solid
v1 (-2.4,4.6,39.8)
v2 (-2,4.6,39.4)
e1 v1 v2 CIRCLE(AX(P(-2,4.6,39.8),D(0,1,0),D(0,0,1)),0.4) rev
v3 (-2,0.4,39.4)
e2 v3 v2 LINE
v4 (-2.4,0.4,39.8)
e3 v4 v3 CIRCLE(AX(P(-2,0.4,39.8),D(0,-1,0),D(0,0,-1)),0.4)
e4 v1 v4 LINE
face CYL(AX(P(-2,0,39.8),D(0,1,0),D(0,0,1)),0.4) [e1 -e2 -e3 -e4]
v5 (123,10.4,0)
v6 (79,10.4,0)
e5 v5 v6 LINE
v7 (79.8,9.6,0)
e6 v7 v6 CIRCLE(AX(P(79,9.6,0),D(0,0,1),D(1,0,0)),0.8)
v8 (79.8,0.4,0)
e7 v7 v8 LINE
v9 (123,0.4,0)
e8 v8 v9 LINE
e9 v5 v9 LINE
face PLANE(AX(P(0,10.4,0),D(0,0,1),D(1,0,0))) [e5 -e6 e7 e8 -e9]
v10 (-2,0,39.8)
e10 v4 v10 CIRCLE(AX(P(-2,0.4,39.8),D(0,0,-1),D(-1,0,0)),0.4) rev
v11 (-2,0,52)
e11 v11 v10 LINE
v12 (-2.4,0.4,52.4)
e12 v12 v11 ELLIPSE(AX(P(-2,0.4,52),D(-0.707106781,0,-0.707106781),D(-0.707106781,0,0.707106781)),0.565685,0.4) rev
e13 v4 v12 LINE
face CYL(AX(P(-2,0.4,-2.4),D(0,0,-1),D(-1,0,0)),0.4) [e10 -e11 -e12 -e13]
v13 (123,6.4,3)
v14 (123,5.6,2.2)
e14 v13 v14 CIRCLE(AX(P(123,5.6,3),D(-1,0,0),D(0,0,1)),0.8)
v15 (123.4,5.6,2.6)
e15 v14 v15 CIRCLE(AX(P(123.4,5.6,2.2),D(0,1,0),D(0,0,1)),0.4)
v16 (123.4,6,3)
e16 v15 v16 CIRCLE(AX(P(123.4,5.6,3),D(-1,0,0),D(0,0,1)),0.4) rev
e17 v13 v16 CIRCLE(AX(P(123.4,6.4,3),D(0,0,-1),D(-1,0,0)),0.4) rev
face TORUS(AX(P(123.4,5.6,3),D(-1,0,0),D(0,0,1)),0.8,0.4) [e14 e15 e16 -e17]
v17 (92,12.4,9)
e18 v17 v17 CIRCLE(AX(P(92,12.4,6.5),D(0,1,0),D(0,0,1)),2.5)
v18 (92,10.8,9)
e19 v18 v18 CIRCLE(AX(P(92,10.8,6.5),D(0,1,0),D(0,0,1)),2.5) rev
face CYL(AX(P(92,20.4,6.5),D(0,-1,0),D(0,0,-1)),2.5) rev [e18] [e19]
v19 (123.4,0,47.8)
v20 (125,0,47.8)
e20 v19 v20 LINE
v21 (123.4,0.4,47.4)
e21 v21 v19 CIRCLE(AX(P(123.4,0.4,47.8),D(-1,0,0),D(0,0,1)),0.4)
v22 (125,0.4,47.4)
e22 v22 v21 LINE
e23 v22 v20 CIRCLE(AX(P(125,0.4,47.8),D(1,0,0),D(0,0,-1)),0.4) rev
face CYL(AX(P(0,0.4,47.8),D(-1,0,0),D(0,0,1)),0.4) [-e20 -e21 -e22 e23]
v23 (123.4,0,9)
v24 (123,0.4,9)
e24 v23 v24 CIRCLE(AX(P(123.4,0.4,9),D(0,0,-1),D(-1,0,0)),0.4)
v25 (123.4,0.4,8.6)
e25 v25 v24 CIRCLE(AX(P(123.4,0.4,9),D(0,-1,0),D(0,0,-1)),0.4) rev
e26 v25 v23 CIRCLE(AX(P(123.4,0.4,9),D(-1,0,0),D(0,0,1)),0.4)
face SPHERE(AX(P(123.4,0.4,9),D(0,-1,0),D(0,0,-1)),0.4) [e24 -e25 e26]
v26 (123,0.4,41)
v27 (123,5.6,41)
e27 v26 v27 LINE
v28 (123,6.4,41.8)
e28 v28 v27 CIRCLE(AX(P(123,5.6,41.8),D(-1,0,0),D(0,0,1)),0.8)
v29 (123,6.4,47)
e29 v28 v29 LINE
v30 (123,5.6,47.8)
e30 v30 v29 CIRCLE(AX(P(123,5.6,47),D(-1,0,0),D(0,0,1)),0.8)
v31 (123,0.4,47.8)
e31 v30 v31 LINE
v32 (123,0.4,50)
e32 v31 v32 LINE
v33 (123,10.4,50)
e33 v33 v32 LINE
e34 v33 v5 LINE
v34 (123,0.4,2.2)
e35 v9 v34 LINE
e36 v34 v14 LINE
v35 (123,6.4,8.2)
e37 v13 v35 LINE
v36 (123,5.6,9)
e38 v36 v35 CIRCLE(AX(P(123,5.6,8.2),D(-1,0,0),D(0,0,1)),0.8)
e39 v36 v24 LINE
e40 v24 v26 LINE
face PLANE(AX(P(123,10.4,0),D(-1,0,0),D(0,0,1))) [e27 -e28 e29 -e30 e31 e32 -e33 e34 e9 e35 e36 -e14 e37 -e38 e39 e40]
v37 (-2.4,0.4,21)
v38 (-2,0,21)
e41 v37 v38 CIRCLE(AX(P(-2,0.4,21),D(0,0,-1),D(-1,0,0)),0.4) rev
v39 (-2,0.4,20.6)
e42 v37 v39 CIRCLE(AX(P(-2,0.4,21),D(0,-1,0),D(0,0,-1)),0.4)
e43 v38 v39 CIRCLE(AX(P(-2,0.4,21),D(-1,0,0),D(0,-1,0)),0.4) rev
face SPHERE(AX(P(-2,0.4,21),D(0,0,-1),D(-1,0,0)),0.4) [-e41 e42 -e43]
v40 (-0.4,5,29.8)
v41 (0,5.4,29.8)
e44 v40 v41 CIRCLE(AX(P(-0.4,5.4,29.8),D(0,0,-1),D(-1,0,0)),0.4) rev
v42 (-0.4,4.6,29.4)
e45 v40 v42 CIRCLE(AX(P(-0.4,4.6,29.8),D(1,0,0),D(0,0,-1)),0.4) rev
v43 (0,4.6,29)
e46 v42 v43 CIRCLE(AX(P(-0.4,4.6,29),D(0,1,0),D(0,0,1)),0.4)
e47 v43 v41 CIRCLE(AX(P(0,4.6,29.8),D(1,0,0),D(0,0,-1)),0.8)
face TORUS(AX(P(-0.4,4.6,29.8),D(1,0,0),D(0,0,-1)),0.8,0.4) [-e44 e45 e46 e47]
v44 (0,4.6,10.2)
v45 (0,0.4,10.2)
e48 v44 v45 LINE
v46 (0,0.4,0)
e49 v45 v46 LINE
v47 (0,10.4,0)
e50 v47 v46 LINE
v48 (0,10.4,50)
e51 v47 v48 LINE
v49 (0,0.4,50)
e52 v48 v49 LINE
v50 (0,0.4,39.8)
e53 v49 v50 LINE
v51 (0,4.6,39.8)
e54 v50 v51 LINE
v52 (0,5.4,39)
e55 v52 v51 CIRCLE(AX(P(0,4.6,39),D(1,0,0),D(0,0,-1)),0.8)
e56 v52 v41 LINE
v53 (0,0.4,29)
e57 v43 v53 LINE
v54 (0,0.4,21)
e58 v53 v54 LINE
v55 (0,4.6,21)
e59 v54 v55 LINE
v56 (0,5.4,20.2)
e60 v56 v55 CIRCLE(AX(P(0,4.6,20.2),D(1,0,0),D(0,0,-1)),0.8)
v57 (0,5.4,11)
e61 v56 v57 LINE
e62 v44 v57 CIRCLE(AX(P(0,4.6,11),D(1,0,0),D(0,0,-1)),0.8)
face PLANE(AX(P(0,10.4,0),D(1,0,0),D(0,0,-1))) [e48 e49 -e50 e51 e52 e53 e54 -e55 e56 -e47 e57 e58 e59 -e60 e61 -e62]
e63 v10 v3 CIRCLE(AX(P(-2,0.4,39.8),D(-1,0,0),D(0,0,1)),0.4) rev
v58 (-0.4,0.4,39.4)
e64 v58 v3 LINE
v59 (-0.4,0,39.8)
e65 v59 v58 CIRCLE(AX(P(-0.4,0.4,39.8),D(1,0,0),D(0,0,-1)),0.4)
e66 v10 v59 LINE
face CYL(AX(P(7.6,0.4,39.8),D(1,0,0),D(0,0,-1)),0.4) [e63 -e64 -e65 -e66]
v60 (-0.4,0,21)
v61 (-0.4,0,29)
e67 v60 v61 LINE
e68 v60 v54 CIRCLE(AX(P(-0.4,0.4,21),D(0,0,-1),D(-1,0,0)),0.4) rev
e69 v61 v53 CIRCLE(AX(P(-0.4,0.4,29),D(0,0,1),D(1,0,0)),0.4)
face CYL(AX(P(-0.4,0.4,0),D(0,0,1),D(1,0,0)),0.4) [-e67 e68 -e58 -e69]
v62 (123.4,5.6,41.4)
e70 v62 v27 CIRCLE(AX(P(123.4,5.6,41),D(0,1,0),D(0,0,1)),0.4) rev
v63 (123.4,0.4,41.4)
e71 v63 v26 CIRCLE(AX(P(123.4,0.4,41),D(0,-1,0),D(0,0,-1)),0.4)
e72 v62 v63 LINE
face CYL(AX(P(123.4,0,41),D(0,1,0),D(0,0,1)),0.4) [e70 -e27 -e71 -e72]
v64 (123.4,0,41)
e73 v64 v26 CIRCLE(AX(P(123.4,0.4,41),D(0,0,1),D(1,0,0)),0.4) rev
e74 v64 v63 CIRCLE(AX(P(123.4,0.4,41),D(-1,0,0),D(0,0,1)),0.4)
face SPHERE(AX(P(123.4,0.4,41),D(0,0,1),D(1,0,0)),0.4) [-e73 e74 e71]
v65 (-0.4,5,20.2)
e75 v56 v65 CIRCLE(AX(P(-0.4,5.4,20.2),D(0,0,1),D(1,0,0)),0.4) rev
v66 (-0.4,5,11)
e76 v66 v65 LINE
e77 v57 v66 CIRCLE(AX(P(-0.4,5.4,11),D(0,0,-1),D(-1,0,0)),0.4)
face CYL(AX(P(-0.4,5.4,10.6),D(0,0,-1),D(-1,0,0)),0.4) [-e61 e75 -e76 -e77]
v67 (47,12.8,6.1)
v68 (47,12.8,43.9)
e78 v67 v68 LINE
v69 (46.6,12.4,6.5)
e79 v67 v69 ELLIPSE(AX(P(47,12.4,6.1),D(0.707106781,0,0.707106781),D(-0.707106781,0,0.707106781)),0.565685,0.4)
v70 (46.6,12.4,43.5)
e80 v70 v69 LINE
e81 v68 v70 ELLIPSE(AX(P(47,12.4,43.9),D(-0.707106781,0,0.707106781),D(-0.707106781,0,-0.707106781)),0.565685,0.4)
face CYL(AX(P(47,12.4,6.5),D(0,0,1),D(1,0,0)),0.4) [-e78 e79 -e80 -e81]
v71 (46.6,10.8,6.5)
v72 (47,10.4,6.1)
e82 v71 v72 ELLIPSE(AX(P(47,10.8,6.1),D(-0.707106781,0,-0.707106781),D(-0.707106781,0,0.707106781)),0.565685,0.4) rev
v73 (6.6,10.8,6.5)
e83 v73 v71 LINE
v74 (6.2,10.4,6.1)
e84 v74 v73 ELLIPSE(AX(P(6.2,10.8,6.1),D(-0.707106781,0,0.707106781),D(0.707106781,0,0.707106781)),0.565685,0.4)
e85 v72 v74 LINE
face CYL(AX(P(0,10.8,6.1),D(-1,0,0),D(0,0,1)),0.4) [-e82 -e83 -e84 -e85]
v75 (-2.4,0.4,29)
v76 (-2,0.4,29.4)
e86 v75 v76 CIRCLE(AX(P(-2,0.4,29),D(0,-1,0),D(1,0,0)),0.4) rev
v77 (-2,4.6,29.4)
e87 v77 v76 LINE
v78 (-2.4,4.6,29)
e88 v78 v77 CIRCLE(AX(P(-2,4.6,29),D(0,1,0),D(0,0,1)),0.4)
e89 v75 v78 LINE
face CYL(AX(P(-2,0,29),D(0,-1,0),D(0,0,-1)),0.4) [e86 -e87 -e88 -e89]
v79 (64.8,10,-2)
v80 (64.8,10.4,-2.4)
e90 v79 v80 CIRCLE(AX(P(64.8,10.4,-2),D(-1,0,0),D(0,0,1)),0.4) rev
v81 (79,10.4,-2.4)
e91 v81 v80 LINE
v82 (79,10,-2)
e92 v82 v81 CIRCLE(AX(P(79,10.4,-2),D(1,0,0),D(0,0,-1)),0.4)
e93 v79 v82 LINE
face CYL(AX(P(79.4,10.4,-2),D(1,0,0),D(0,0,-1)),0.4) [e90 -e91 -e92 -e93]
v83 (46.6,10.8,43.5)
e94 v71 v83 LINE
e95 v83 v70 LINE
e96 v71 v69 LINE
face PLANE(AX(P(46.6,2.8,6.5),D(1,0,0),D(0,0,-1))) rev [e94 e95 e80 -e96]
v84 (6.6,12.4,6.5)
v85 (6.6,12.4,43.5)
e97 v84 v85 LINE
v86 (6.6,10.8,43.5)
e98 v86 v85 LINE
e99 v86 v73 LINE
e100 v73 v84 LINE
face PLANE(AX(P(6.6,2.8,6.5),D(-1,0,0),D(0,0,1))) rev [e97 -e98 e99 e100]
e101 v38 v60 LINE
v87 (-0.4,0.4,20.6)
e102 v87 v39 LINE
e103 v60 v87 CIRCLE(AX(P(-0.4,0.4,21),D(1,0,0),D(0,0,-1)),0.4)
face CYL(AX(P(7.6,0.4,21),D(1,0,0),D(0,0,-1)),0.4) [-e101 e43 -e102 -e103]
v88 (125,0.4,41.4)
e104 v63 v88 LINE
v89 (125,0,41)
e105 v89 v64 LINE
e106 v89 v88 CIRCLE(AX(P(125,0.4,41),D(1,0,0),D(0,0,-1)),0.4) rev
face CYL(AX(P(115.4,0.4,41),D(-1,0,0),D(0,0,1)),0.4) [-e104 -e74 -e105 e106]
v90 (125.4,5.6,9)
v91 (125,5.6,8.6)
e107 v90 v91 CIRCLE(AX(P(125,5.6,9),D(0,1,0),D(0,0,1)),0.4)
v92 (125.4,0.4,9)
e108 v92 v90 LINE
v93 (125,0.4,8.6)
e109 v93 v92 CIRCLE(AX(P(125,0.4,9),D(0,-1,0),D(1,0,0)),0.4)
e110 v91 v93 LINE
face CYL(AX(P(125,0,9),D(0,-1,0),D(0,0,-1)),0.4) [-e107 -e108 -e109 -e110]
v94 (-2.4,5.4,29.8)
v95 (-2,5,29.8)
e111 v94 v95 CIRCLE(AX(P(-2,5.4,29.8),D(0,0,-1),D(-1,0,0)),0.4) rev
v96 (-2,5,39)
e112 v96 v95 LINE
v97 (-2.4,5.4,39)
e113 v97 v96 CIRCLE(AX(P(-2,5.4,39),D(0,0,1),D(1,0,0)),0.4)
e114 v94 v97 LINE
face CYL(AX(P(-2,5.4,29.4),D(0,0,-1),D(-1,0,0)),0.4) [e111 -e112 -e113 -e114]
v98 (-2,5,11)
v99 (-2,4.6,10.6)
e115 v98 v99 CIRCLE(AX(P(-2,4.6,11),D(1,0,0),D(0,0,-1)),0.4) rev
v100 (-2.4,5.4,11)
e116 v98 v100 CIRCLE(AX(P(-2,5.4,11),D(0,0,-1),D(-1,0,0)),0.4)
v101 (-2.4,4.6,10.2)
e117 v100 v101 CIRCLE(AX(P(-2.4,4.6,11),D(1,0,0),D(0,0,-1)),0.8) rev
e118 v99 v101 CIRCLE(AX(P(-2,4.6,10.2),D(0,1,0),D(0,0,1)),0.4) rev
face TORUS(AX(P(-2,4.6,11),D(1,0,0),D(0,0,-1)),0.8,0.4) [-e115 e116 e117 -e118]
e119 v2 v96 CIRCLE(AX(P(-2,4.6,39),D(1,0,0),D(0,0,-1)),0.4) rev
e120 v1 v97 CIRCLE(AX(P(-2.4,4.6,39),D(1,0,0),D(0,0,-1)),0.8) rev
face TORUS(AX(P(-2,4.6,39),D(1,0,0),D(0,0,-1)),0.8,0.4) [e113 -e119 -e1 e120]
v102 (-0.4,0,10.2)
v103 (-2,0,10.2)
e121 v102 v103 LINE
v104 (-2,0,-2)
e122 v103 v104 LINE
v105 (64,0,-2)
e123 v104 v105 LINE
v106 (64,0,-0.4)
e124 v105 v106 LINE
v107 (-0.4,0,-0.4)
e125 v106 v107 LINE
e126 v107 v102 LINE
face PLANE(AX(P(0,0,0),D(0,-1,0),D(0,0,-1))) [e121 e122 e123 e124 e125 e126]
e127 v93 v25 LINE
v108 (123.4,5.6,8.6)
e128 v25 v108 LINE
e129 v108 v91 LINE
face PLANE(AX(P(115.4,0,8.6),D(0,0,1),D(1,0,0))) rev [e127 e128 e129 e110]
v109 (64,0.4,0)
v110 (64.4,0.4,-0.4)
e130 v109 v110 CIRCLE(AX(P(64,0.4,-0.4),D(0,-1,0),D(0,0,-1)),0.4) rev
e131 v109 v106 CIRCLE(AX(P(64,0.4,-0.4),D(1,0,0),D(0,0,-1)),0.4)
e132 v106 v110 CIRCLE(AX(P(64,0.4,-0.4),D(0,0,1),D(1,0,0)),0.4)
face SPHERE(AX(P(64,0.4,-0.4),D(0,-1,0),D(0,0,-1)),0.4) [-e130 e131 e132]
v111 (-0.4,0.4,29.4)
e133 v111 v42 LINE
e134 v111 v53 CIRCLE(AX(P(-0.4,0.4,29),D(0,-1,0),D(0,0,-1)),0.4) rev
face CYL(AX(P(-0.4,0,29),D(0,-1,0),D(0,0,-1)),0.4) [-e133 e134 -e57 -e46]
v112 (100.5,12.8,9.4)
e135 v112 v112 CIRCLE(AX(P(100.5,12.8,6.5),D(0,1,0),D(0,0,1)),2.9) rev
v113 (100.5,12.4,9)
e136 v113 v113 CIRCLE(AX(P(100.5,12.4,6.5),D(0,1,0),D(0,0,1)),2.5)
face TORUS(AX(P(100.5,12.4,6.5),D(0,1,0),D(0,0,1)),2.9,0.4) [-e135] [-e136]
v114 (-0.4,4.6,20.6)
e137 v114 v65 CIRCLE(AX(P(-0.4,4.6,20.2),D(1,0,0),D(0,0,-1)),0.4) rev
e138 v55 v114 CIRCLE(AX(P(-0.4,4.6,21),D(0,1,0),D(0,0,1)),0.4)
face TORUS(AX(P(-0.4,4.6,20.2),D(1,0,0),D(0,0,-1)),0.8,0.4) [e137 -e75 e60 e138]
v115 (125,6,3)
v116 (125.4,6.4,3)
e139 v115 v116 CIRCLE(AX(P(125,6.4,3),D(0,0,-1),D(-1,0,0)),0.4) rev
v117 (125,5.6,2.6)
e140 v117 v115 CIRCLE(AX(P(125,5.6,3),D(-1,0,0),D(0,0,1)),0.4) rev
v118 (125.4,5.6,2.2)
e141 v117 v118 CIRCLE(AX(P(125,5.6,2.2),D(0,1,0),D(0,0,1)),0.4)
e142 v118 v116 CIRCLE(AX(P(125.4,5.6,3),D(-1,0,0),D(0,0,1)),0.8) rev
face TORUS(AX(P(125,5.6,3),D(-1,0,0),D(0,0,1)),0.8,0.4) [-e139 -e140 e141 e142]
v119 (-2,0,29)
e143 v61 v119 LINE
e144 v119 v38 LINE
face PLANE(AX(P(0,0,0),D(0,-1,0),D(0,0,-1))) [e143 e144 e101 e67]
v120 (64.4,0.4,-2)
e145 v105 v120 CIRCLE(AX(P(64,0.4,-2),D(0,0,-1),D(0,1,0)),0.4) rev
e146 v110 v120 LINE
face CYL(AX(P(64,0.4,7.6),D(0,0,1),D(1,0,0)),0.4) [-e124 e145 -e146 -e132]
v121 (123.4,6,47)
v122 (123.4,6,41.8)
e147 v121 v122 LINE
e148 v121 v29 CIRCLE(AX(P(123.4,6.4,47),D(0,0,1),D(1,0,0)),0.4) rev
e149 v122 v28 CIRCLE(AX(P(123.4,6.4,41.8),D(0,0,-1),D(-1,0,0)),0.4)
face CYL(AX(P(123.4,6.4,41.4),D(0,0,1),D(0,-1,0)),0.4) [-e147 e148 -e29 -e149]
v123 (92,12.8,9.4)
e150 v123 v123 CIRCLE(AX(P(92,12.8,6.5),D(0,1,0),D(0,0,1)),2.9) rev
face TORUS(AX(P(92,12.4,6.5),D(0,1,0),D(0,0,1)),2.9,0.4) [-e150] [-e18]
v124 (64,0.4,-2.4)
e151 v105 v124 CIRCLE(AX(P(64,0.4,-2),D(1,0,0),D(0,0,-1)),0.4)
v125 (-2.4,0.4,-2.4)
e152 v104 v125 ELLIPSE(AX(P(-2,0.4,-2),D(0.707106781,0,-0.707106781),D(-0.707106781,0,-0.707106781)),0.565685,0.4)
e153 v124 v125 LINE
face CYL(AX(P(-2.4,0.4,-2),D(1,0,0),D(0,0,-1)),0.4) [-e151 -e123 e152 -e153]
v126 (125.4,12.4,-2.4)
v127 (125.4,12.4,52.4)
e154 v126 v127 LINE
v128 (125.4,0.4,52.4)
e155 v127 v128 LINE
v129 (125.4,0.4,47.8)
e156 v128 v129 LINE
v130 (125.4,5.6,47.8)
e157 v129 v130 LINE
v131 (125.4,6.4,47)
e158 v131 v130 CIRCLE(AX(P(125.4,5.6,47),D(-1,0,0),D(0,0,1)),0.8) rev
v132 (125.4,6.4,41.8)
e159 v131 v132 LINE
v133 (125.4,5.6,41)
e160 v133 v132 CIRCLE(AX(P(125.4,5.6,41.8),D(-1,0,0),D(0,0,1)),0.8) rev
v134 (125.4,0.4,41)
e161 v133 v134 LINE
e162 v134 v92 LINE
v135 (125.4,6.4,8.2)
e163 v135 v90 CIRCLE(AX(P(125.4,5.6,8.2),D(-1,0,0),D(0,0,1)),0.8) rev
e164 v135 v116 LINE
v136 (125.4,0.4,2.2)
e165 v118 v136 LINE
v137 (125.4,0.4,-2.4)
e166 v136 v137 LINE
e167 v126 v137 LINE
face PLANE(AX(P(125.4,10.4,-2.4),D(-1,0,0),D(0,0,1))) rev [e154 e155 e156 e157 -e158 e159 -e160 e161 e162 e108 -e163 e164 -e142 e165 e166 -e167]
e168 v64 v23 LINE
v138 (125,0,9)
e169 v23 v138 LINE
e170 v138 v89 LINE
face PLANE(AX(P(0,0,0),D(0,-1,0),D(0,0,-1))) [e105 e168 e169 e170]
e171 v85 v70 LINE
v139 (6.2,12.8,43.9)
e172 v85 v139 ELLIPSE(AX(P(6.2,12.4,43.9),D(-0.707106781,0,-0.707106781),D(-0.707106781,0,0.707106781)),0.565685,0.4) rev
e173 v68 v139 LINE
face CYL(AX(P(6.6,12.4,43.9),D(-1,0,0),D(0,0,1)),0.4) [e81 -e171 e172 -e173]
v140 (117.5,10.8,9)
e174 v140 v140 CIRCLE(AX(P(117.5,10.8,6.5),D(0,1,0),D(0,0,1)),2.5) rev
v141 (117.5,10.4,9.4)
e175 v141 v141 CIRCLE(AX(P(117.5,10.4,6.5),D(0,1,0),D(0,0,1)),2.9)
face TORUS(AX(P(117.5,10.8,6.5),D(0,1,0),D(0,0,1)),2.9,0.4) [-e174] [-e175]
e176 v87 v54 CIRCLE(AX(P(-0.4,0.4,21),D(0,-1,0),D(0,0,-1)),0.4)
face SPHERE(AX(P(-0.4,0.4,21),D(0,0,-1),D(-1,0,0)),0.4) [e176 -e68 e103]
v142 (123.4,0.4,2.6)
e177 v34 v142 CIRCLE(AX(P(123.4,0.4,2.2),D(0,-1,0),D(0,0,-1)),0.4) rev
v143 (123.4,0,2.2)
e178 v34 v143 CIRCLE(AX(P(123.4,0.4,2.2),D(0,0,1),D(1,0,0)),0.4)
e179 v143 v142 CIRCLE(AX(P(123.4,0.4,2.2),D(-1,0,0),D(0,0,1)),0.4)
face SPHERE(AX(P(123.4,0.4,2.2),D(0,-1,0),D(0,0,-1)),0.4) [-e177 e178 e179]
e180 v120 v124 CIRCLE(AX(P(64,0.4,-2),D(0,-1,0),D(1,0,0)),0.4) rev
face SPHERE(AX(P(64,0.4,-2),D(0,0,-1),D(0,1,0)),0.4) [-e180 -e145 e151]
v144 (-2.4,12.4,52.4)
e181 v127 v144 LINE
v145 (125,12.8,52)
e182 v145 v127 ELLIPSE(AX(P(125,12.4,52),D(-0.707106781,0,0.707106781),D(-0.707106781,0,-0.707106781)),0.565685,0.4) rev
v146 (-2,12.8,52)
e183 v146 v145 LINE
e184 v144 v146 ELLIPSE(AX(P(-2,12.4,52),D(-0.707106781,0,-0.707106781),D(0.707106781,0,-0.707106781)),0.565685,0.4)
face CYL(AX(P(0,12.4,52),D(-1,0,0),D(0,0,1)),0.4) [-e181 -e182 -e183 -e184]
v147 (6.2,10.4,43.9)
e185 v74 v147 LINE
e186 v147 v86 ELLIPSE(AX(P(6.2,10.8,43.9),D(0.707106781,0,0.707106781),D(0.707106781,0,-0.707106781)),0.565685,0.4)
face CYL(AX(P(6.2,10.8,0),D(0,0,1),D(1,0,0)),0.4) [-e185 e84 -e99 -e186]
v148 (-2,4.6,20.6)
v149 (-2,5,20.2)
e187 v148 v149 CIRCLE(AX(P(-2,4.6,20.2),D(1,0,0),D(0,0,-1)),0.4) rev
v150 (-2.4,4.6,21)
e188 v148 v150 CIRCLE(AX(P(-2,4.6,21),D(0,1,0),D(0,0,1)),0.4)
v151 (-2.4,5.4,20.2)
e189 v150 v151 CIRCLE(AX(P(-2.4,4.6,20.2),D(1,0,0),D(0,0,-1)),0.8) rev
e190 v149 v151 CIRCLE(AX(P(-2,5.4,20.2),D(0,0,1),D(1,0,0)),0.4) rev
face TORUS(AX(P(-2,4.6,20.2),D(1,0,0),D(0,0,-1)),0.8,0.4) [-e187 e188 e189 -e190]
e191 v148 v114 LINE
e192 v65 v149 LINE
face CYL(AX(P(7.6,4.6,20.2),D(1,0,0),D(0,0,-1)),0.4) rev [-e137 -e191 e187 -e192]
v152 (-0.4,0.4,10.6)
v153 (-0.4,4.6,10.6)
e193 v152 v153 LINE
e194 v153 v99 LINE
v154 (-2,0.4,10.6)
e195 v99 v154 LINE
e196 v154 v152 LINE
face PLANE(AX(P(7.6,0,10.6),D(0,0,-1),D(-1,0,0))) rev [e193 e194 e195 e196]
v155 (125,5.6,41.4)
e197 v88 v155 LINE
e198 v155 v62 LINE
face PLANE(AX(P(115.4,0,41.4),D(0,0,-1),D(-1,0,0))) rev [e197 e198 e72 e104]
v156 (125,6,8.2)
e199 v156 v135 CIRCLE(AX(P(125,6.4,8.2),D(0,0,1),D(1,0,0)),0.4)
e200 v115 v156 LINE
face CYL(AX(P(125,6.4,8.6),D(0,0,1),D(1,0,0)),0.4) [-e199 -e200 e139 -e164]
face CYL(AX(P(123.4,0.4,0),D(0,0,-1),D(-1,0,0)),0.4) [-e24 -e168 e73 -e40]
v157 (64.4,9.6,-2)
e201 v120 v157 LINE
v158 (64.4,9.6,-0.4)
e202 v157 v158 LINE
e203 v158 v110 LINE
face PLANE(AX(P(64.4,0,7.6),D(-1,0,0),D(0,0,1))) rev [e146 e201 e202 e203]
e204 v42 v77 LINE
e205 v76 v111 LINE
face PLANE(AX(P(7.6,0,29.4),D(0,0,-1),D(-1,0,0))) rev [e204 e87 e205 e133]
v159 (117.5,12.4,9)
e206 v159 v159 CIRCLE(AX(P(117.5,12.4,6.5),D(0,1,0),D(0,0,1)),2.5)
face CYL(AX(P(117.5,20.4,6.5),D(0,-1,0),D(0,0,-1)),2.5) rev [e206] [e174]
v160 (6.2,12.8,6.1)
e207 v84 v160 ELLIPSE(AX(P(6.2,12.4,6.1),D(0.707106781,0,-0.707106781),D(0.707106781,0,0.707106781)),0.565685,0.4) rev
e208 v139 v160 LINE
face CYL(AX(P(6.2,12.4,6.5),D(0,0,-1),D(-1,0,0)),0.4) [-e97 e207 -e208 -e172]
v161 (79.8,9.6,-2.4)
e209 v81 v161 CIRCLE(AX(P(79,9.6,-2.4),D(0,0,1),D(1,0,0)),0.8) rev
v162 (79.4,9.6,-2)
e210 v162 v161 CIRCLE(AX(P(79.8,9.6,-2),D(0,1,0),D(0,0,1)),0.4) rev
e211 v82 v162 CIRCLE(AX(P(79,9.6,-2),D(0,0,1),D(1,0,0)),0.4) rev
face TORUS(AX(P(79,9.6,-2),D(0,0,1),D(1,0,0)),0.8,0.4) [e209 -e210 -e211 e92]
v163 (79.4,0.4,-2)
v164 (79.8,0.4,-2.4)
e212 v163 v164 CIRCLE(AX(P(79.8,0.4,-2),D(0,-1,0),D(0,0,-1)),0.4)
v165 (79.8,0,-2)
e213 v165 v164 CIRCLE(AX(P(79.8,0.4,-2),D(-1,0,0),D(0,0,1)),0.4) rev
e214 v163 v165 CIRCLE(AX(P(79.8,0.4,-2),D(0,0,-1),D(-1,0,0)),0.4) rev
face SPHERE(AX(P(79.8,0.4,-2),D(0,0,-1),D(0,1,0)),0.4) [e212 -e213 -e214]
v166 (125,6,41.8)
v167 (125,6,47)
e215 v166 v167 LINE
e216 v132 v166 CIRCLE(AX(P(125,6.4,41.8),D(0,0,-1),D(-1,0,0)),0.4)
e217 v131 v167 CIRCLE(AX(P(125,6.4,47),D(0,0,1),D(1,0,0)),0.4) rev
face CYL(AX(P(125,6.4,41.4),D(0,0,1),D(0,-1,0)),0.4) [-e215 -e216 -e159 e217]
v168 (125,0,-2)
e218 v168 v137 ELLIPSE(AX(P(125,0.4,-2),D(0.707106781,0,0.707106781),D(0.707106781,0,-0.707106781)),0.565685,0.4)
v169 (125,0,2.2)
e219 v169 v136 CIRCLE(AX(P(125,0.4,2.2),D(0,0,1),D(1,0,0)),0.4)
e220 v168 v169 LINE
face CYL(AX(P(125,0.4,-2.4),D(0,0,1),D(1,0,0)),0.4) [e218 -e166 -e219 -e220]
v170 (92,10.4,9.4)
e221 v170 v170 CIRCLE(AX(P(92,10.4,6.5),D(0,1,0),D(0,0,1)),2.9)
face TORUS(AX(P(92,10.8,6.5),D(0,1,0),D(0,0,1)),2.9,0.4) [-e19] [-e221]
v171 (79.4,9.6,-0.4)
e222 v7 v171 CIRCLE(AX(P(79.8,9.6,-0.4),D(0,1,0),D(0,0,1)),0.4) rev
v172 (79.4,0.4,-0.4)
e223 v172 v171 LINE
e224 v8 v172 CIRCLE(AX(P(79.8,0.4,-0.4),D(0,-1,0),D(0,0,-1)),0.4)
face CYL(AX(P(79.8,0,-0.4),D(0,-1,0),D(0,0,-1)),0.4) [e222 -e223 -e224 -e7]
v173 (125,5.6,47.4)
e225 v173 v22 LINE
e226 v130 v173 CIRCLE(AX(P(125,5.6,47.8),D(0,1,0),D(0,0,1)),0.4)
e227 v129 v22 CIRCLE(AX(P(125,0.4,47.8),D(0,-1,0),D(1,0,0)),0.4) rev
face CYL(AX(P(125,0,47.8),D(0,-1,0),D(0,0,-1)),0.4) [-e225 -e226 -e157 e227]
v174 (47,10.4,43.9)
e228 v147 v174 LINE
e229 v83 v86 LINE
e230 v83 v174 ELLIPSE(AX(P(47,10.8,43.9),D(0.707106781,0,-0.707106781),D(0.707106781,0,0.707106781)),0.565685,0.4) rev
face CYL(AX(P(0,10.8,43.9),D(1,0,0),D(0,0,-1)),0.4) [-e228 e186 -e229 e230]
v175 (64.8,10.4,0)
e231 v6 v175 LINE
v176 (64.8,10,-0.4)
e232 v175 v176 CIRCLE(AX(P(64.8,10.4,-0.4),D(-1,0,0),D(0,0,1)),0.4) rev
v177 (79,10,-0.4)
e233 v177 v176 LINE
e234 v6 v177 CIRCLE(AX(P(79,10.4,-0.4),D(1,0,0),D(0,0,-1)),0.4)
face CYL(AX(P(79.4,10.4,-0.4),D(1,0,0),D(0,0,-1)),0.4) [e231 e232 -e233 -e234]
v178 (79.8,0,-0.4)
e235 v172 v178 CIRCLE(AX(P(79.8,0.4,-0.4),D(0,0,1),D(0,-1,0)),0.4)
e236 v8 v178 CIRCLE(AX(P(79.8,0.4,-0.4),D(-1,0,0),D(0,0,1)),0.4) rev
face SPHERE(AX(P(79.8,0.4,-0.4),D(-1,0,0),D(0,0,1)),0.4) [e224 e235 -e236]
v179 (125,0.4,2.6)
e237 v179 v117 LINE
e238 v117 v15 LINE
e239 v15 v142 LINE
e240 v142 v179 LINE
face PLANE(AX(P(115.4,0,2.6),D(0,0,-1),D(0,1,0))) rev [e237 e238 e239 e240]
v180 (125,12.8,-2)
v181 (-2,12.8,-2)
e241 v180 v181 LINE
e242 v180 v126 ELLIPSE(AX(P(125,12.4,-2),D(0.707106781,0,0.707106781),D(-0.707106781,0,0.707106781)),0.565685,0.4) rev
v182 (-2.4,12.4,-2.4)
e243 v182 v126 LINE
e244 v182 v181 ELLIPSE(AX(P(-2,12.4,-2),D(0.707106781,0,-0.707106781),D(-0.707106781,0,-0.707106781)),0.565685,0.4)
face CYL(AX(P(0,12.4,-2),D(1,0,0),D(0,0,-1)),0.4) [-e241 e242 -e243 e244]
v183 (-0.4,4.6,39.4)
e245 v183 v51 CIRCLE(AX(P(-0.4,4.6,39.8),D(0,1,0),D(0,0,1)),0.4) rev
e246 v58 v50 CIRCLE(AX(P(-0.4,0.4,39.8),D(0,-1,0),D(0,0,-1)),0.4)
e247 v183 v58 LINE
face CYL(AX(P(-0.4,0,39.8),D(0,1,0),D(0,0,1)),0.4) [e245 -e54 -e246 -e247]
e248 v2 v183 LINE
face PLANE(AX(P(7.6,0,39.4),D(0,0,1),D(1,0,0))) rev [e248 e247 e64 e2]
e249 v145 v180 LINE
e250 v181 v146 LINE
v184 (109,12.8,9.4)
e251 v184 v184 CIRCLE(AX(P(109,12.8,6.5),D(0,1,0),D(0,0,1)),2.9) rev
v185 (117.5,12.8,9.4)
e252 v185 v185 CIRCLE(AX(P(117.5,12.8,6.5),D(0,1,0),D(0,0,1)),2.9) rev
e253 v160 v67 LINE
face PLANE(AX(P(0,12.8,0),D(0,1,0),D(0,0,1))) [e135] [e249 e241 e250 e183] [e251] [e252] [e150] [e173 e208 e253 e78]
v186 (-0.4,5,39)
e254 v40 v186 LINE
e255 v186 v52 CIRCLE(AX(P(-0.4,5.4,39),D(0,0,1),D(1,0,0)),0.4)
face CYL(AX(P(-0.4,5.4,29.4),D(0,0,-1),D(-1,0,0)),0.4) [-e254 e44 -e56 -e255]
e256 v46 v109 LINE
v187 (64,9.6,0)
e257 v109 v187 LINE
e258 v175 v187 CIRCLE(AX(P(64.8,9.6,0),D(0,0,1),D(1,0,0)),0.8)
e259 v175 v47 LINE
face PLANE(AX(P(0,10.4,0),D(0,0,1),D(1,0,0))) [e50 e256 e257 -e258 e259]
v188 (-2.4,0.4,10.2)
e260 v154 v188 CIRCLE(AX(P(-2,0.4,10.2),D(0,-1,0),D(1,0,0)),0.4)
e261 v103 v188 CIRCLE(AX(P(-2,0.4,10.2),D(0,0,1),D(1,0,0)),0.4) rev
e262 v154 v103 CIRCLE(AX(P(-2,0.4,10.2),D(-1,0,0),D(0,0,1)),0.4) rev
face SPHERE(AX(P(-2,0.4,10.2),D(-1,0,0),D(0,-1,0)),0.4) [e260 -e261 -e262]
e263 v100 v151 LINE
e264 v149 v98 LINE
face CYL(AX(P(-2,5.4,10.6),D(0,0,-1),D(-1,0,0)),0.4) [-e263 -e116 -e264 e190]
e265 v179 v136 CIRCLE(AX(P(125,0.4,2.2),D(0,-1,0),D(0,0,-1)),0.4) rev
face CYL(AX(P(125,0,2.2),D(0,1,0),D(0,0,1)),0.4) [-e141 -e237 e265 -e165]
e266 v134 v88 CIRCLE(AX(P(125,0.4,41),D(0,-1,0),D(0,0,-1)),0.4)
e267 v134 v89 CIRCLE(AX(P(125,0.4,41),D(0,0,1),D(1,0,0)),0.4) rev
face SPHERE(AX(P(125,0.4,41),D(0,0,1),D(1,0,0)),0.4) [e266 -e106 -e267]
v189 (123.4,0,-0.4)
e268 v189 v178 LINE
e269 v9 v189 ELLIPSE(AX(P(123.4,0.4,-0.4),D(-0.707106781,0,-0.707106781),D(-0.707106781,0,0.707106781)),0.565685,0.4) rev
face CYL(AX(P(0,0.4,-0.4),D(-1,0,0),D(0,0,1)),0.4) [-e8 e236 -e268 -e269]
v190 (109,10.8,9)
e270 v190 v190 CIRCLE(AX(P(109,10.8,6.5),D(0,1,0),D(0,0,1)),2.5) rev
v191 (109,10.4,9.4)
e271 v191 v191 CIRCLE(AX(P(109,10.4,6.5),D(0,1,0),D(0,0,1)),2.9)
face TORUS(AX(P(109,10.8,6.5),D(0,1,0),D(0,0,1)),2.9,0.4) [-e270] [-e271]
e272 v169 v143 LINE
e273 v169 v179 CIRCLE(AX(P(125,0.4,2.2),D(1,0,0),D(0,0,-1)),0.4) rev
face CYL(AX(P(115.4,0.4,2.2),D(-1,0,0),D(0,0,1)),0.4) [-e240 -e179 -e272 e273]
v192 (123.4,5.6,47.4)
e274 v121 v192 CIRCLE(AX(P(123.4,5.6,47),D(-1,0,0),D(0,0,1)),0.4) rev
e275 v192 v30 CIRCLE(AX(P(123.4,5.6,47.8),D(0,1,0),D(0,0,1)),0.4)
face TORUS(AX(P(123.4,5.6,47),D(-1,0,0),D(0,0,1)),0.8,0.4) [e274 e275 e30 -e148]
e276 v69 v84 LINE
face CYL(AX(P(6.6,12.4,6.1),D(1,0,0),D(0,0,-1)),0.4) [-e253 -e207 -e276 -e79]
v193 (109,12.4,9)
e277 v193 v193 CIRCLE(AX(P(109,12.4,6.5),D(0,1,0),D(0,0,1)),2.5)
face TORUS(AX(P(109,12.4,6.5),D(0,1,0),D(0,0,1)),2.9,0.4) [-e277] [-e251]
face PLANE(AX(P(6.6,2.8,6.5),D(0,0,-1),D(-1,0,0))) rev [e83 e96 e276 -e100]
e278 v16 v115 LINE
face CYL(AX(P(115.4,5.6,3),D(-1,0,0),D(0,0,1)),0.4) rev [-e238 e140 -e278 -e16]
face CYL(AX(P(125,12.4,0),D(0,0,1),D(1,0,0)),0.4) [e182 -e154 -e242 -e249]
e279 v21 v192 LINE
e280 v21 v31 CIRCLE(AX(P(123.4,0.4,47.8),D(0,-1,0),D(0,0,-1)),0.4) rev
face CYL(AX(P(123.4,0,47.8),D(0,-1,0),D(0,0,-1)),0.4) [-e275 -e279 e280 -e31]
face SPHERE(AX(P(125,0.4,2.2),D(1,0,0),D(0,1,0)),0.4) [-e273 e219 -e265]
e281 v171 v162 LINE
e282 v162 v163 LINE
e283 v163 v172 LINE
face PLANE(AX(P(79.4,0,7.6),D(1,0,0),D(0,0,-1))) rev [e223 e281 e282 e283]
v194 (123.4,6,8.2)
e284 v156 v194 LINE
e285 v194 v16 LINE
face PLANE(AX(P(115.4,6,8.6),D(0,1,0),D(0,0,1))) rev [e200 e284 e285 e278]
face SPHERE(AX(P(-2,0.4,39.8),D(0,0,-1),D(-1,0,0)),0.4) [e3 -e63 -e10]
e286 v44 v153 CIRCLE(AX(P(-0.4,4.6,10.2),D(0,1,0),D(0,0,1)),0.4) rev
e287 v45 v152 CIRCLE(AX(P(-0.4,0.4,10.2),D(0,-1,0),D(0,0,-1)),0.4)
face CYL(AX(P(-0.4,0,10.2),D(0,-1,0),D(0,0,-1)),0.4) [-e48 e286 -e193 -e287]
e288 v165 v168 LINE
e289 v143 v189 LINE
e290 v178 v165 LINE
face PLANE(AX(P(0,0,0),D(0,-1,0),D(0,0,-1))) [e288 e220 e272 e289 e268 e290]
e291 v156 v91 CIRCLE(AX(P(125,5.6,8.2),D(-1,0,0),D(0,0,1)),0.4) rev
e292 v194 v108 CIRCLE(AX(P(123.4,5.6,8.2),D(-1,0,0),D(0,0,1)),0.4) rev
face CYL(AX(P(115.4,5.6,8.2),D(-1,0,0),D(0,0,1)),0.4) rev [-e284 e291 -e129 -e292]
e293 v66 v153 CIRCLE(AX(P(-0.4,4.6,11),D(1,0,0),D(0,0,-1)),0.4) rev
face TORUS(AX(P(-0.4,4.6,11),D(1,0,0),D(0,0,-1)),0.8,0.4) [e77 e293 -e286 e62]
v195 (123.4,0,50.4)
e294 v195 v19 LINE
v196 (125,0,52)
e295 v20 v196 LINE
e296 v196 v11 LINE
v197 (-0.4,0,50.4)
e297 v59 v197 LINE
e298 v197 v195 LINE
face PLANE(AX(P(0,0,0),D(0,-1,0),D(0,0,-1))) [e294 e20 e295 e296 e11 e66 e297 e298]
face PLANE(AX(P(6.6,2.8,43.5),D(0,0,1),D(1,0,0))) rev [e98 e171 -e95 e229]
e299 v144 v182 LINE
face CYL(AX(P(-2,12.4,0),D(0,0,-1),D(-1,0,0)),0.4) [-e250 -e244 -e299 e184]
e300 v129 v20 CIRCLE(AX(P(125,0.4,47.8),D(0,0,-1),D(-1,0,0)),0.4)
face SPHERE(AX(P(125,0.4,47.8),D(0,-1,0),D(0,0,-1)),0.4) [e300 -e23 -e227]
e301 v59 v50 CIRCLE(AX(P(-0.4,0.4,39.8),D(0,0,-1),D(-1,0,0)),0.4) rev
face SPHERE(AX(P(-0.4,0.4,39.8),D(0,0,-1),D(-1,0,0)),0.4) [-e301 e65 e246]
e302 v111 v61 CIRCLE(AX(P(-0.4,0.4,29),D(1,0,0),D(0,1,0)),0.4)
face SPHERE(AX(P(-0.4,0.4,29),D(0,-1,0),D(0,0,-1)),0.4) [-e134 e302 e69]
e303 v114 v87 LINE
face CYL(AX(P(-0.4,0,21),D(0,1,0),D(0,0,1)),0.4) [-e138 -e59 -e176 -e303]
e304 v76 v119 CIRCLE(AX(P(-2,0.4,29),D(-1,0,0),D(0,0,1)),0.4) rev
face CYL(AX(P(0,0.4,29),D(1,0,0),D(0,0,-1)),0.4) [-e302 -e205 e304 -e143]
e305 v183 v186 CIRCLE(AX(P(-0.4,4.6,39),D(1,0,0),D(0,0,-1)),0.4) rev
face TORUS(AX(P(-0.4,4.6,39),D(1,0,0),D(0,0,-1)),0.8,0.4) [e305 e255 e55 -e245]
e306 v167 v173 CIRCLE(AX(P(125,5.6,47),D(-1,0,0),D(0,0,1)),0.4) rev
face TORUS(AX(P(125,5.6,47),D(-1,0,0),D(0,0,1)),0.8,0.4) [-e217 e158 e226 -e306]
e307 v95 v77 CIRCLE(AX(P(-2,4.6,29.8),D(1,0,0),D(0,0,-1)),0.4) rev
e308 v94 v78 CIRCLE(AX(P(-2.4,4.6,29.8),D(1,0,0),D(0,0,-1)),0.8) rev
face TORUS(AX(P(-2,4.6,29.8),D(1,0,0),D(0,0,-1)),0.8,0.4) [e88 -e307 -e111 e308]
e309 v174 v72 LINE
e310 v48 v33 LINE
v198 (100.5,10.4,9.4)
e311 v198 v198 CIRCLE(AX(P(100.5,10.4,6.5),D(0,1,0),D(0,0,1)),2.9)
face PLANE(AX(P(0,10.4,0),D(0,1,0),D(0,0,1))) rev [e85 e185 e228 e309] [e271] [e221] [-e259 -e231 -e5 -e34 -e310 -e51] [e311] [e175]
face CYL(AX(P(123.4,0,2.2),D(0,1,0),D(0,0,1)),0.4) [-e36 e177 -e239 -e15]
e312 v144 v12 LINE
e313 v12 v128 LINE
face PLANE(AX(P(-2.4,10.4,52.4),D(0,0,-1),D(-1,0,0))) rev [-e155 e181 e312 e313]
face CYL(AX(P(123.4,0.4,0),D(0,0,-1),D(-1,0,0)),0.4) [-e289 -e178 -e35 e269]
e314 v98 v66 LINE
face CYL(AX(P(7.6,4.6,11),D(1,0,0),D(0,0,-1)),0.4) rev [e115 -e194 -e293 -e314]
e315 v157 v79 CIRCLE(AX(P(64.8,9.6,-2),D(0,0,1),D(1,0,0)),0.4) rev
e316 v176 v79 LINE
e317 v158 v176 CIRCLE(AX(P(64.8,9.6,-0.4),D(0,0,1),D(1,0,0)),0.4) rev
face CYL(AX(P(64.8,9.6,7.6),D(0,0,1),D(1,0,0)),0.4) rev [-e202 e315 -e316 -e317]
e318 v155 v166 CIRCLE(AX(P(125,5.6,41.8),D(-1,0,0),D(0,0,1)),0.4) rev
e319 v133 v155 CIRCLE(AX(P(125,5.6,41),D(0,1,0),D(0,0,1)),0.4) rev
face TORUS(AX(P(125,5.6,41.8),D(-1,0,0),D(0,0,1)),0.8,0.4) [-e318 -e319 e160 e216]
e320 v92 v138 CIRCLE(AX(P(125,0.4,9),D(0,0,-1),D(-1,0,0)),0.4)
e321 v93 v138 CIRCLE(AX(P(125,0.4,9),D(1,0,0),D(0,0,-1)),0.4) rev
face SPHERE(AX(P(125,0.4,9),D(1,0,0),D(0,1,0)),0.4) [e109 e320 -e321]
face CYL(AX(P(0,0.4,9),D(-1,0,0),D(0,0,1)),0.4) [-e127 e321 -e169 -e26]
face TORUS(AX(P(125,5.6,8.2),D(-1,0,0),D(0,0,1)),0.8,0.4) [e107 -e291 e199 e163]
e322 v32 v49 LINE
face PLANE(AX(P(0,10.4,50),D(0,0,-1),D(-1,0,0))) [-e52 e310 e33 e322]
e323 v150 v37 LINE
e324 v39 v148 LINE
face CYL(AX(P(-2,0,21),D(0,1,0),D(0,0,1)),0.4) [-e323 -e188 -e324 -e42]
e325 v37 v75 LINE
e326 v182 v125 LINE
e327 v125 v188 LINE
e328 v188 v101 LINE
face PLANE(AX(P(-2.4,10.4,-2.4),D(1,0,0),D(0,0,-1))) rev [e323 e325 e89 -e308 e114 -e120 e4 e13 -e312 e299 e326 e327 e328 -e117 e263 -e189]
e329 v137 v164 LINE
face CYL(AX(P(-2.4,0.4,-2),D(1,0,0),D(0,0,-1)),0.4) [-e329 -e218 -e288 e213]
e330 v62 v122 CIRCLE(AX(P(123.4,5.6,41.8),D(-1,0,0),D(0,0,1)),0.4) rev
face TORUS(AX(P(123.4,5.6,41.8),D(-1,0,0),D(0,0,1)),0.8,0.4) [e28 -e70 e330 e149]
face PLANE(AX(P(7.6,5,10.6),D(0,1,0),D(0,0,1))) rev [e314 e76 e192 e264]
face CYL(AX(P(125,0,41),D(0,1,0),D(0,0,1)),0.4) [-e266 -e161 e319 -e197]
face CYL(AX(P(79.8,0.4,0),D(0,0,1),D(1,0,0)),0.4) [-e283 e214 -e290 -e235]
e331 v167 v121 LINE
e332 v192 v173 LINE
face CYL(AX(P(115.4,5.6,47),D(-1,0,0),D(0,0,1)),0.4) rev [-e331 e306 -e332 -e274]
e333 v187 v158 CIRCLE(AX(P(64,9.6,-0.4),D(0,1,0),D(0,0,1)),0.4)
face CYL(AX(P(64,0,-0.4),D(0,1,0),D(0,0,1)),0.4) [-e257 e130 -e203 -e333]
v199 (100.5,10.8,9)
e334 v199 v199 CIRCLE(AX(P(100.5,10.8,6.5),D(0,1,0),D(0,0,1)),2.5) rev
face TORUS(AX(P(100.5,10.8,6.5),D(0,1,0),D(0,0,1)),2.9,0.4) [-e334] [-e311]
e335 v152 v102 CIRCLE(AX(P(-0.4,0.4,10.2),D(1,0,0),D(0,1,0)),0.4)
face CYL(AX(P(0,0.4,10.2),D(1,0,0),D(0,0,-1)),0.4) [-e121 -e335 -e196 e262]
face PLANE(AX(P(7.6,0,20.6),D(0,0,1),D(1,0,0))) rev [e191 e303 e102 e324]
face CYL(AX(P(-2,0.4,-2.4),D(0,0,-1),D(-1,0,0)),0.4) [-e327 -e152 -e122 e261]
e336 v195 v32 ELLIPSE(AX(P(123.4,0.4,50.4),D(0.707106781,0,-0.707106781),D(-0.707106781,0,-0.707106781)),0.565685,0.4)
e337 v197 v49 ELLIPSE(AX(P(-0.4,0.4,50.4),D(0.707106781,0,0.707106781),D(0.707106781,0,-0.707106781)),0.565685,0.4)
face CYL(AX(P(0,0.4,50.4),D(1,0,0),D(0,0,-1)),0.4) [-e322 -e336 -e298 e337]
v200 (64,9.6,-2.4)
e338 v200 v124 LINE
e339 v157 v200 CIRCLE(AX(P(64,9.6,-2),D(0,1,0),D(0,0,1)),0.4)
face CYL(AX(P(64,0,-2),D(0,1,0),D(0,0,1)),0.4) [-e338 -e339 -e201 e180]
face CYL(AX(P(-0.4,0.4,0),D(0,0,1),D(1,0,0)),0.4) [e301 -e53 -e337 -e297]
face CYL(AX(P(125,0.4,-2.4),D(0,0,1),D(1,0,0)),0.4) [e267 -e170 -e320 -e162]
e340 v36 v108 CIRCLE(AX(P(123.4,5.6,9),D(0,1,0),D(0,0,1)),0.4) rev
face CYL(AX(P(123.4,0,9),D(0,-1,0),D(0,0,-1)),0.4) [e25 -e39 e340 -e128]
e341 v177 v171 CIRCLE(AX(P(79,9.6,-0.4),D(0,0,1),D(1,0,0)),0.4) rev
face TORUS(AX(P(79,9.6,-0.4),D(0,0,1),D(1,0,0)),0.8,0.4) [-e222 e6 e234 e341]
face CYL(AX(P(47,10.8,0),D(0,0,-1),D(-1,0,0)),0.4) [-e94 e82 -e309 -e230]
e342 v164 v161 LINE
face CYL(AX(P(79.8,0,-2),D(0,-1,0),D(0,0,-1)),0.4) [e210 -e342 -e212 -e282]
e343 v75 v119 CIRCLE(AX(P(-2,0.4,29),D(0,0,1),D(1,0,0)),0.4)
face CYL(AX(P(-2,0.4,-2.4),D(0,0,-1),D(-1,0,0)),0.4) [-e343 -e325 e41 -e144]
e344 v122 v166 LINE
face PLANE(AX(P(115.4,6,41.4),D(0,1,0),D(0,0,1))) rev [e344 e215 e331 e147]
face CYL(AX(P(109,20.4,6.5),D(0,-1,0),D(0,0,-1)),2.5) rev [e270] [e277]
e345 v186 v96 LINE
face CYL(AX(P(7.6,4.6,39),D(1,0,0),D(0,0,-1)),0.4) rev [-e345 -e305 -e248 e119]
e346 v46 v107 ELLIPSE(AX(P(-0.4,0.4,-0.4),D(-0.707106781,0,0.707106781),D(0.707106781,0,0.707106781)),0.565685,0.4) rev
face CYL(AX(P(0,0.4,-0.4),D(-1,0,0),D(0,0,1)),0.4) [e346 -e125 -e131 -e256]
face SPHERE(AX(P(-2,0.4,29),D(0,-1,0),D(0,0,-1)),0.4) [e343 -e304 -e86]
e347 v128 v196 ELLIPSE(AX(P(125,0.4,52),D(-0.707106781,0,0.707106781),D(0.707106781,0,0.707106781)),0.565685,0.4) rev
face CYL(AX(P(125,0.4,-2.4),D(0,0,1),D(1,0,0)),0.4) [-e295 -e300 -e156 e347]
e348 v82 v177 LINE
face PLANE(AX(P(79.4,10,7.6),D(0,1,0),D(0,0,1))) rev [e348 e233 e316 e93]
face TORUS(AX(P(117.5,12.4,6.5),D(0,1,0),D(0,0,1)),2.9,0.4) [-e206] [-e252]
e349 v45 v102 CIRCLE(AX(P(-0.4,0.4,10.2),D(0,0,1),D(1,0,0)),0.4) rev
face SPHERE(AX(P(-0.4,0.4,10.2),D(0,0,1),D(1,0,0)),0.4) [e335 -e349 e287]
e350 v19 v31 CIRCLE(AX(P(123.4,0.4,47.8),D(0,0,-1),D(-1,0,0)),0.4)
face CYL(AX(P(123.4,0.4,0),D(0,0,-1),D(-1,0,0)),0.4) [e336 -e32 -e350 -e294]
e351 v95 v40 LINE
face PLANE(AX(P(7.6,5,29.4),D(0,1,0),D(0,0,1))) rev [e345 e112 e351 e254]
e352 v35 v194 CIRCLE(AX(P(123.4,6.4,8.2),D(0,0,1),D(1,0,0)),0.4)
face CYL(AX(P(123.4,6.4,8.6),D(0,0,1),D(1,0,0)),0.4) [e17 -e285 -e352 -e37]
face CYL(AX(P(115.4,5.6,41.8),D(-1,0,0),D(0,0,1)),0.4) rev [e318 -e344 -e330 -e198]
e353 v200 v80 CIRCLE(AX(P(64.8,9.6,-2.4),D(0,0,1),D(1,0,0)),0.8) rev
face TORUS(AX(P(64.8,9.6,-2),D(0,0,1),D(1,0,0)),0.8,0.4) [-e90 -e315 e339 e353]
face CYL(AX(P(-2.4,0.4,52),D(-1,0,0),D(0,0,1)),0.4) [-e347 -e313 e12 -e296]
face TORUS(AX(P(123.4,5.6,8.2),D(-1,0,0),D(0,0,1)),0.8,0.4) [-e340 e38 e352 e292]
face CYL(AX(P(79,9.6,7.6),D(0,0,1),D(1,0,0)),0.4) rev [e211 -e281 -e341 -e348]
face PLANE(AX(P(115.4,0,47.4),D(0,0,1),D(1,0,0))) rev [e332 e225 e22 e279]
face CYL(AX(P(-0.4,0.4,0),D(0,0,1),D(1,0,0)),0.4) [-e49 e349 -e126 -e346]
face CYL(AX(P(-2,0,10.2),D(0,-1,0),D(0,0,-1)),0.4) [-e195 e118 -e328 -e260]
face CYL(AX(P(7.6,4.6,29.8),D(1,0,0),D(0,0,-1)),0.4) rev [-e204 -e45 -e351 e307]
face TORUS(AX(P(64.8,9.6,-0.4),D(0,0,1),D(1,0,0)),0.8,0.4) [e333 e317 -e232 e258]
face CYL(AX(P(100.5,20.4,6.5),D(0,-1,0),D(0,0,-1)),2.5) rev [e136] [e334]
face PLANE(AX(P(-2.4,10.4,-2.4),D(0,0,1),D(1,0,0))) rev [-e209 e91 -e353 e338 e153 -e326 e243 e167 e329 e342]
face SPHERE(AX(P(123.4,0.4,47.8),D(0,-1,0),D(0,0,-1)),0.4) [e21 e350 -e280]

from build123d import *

# Parameters (mm, degrees)
SKETCH1_W           = 127.8
SKETCH1_H           = 54.8
SKETCH1_W_2         = 123
SKETCH1_H_2         = 50
BOSS_EXTRUDE1_DEPTH = 10.4
SKETCH2_W           = 127.8
SKETCH2_H           = 54.8
BOSS_EXTRUDE2_DEPTH = 2.4
SKETCH3_W           = 10
SKETCH3_H           = 5
CUT_EXTRUDE1_DEPTH  = 10
SKETCH4_W           = 40
SKETCH4_H           = 37
CUT_EXTRUDE2_DEPTH  = 10
SKETCH5_W           = 6
SKETCH5_H           = 6
CUT_EXTRUDE3_DEPTH  = 10
SKETCH6_W           = 15
SKETCH6_H           = 10
CUT_EXTRUDE4_DEPTH  = 10
SKETCH7_R           = 2.5
CUT_EXTRUDE5_DEPTH  = 10
FILLET1_R           = 0.4
FILLET2_R           = 0.4
FILLET3_R           = 0.4
FILLET4_R           = 0.4


with BuildPart() as part:
    # Sketch1 → Boss-Extrude1 (new body)
    with BuildSketch(Plane(origin=(0, 0, 0), x_dir=(1, 0, 0), z_dir=(0, 1, 0))):
        with Locations((61.5, -25)):
            Rectangle(SKETCH1_W, SKETCH1_H)
        with Locations((61.5, -25)):
            Rectangle(SKETCH1_W_2, SKETCH1_H_2, mode=Mode.SUBTRACT)
    extrude(amount=BOSS_EXTRUDE1_DEPTH)

    # Sketch2 → Boss-Extrude2 (add)
    with BuildSketch(Plane(origin=(0, 10.4, 0), x_dir=(1, 0, 0), z_dir=(0, 1, 0))):
        with Locations((61.5, -25)):
            Rectangle(SKETCH2_W, SKETCH2_H)
    extrude(amount=BOSS_EXTRUDE2_DEPTH)

    # Sketch3 → Cut-Extrude1 (cut)
    with BuildSketch(Plane.ZY.offset(2.4)):
        with Locations((15.6, 2.5)):
            Rectangle(SKETCH3_W, SKETCH3_H)
        with Locations((34.4, 2.5)):
            Rectangle(SKETCH3_W, SKETCH3_H)
    extrude(amount=-CUT_EXTRUDE1_DEPTH, mode=Mode.SUBTRACT)

    # Sketch4 → Cut-Extrude2 (cut)
    with BuildSketch(Plane(origin=(0, 12.8, 0), x_dir=(1, 0, 0), z_dir=(0, 1, 0))):
        with Locations((26.6, -25)):
            Rectangle(SKETCH4_W, SKETCH4_H)
    extrude(amount=-CUT_EXTRUDE2_DEPTH, mode=Mode.SUBTRACT)

    # Sketch5 → Cut-Extrude3 (cut)
    with BuildSketch(Plane(origin=(125.4, 0, 0), x_dir=(0, 0, -1), z_dir=(1, 0, 0))):
        with Locations((-5.6, 3)):
            Rectangle(SKETCH5_W, SKETCH5_H)
        with Locations((-44.4, 3)):
            Rectangle(SKETCH5_W, SKETCH5_H)
    extrude(amount=-CUT_EXTRUDE3_DEPTH, mode=Mode.SUBTRACT)

    # Sketch6 → Cut-Extrude4 (cut)
    with BuildSketch(Plane(origin=(0, 0, -2.4), x_dir=(-1, 0, 0), z_dir=(0, 0, -1))):
        with Locations((-71.9, 5)):
            Rectangle(SKETCH6_W, SKETCH6_H)
    extrude(amount=-CUT_EXTRUDE4_DEPTH, mode=Mode.SUBTRACT)

    # Sketch7 → Cut-Extrude5 (cut)
    with BuildSketch(Plane(origin=(0, 10.4, 0), x_dir=(-1, 0, 0), z_dir=(0, -1, 0))):
        with Locations(Location((-117.5, -6.5, 0), (0, 0, 90))):
            Circle(SKETCH7_R)
        with Locations(Location((-109, -6.5, 0), (0, 0, 90))):
            Circle(SKETCH7_R)
        with Locations(Location((-100.5, -6.5, 0), (0, 0, 90))):
            Circle(SKETCH7_R)
        with Locations(Location((-92, -6.5, 0), (0, 0, 90))):
            Circle(SKETCH7_R)
    extrude(amount=-CUT_EXTRUDE5_DEPTH, mode=Mode.SUBTRACT)

    # Fillet1
    fillet1_edges = [part.edges().sort_by_distance(p)[0] for p in [
        (117.5, 12.8, 9),
        (109, 12.8, 9),
        (100.5, 12.8, 9),
        (92, 12.8, 9),
        (-2.4, 12.8, 25),
        (61.5, 12.8, 52.4),
        (125.4, 12.8, 25),
        (61.5, 12.8, -2.4),
        (6.6, 12.8, 25),
        (26.6, 12.8, 43.5),
        (46.6, 12.8, 25),
        (26.6, 12.8, 6.5),
    ]]
    fillet(fillet1_edges, radius=FILLET1_R)

    # Fillet2
    fillet2_edges = [part.edges().sort_by_distance(p)[0] for p in [
        (123, 0, 25),
        (123, 0, 1.3),
        (123, 6, 44.4),
        (123, 3, 47.4),
        (123, 3, 41.4),
        (123, 3, 2.6),
        (123, 6, 5.6),
        (123, 3, 8.6),
        (125.4, 0, 25),
        (125.4, 0, 0.1),
        (124.2, 0, 8.6),
        (124.2, 6, 8.6),
        (124.2, 6, 2.6),
        (124.2, 0, 2.6),
        (125.4, 3, 8.6),
        (125.4, 3, 2.6),
        (125.4, 6, 5.6),
        (124.2, 6, 41.4),
        (124.2, 0, 41.4),
        (124.2, 0, 47.4),
        (124.2, 6, 47.4),
        (125.4, 3, 41.4),
        (125.4, 6, 44.4),
        (125.4, 3, 47.4),
        (32.2, 0, 0),
        (64.4, 5, 0),
        (71.9, 10, 0),
        (79.4, 5, 0),
        (31, 0, -2.4),
        (79.4, 0, -1.2),
        (79.4, 10, -1.2),
        (64.4, 10, -1.2),
        (64.4, 0, -1.2),
        (79.4, 5, -2.4),
        (64.4, 5, -2.4),
        (71.9, 10, -2.4),
        (0, 0, 5.3),
        (61.5, 0, 50),
        (123, 0, 48.7),
        (101.2, 0, 0),
        (0, 0, 25),
        (0, 0, 44.7),
        (0, 2.5, 39.4),
        (0, 5, 34.4),
        (0, 2.5, 29.4),
        (0, 2.5, 20.6),
        (0, 5, 15.6),
        (0, 2.5, 10.6),
        (-2.4, 0, 25),
        (-2.4, 0, 45.9),
        (125.4, 0, 49.9),
        (61.5, 0, 52.4),
        (-1.2, 0, 10.6),
        (-1.2, 5, 10.6),
        (-1.2, 5, 20.6),
        (-1.2, 0, 20.6),
        (-2.4, 2.5, 10.6),
        (-2.4, 2.5, 20.6),
        (-2.4, 5, 15.6),
        (-2.4, 0, 4.1),
        (102.4, 0, -2.4),
        (-1.2, 0, 29.4),
        (-1.2, 5, 29.4),
        (-1.2, 5, 39.4),
        (-1.2, 0, 39.4),
        (-2.4, 2.5, 29.4),
        (-2.4, 2.5, 39.4),
        (-2.4, 5, 34.4),
    ]]
    fillet(fillet2_edges, radius=FILLET2_R - 0.0001)  # a hair under: the kernel refuses the full size

    # Fillet3
    fillet3_edges = [part.edges().sort_by_distance(p)[0] for p in [
        (117.5, 10.4, 9),
        (109, 10.4, 9),
        (100.5, 10.4, 9),
        (92, 10.4, 9),
    ]]
    fillet(fillet3_edges, radius=FILLET3_R)

    # Fillet4
    fillet4_edges = [part.edges().sort_by_distance(p)[0] for p in [
        (6.6, 10.4, 25),
        (26.6, 10.4, 6.5),
        (46.6, 10.4, 25),
        (26.6, 10.4, 43.5),
    ]]
    fillet(fillet4_edges, radius=FILLET4_R)


solid = part.part
